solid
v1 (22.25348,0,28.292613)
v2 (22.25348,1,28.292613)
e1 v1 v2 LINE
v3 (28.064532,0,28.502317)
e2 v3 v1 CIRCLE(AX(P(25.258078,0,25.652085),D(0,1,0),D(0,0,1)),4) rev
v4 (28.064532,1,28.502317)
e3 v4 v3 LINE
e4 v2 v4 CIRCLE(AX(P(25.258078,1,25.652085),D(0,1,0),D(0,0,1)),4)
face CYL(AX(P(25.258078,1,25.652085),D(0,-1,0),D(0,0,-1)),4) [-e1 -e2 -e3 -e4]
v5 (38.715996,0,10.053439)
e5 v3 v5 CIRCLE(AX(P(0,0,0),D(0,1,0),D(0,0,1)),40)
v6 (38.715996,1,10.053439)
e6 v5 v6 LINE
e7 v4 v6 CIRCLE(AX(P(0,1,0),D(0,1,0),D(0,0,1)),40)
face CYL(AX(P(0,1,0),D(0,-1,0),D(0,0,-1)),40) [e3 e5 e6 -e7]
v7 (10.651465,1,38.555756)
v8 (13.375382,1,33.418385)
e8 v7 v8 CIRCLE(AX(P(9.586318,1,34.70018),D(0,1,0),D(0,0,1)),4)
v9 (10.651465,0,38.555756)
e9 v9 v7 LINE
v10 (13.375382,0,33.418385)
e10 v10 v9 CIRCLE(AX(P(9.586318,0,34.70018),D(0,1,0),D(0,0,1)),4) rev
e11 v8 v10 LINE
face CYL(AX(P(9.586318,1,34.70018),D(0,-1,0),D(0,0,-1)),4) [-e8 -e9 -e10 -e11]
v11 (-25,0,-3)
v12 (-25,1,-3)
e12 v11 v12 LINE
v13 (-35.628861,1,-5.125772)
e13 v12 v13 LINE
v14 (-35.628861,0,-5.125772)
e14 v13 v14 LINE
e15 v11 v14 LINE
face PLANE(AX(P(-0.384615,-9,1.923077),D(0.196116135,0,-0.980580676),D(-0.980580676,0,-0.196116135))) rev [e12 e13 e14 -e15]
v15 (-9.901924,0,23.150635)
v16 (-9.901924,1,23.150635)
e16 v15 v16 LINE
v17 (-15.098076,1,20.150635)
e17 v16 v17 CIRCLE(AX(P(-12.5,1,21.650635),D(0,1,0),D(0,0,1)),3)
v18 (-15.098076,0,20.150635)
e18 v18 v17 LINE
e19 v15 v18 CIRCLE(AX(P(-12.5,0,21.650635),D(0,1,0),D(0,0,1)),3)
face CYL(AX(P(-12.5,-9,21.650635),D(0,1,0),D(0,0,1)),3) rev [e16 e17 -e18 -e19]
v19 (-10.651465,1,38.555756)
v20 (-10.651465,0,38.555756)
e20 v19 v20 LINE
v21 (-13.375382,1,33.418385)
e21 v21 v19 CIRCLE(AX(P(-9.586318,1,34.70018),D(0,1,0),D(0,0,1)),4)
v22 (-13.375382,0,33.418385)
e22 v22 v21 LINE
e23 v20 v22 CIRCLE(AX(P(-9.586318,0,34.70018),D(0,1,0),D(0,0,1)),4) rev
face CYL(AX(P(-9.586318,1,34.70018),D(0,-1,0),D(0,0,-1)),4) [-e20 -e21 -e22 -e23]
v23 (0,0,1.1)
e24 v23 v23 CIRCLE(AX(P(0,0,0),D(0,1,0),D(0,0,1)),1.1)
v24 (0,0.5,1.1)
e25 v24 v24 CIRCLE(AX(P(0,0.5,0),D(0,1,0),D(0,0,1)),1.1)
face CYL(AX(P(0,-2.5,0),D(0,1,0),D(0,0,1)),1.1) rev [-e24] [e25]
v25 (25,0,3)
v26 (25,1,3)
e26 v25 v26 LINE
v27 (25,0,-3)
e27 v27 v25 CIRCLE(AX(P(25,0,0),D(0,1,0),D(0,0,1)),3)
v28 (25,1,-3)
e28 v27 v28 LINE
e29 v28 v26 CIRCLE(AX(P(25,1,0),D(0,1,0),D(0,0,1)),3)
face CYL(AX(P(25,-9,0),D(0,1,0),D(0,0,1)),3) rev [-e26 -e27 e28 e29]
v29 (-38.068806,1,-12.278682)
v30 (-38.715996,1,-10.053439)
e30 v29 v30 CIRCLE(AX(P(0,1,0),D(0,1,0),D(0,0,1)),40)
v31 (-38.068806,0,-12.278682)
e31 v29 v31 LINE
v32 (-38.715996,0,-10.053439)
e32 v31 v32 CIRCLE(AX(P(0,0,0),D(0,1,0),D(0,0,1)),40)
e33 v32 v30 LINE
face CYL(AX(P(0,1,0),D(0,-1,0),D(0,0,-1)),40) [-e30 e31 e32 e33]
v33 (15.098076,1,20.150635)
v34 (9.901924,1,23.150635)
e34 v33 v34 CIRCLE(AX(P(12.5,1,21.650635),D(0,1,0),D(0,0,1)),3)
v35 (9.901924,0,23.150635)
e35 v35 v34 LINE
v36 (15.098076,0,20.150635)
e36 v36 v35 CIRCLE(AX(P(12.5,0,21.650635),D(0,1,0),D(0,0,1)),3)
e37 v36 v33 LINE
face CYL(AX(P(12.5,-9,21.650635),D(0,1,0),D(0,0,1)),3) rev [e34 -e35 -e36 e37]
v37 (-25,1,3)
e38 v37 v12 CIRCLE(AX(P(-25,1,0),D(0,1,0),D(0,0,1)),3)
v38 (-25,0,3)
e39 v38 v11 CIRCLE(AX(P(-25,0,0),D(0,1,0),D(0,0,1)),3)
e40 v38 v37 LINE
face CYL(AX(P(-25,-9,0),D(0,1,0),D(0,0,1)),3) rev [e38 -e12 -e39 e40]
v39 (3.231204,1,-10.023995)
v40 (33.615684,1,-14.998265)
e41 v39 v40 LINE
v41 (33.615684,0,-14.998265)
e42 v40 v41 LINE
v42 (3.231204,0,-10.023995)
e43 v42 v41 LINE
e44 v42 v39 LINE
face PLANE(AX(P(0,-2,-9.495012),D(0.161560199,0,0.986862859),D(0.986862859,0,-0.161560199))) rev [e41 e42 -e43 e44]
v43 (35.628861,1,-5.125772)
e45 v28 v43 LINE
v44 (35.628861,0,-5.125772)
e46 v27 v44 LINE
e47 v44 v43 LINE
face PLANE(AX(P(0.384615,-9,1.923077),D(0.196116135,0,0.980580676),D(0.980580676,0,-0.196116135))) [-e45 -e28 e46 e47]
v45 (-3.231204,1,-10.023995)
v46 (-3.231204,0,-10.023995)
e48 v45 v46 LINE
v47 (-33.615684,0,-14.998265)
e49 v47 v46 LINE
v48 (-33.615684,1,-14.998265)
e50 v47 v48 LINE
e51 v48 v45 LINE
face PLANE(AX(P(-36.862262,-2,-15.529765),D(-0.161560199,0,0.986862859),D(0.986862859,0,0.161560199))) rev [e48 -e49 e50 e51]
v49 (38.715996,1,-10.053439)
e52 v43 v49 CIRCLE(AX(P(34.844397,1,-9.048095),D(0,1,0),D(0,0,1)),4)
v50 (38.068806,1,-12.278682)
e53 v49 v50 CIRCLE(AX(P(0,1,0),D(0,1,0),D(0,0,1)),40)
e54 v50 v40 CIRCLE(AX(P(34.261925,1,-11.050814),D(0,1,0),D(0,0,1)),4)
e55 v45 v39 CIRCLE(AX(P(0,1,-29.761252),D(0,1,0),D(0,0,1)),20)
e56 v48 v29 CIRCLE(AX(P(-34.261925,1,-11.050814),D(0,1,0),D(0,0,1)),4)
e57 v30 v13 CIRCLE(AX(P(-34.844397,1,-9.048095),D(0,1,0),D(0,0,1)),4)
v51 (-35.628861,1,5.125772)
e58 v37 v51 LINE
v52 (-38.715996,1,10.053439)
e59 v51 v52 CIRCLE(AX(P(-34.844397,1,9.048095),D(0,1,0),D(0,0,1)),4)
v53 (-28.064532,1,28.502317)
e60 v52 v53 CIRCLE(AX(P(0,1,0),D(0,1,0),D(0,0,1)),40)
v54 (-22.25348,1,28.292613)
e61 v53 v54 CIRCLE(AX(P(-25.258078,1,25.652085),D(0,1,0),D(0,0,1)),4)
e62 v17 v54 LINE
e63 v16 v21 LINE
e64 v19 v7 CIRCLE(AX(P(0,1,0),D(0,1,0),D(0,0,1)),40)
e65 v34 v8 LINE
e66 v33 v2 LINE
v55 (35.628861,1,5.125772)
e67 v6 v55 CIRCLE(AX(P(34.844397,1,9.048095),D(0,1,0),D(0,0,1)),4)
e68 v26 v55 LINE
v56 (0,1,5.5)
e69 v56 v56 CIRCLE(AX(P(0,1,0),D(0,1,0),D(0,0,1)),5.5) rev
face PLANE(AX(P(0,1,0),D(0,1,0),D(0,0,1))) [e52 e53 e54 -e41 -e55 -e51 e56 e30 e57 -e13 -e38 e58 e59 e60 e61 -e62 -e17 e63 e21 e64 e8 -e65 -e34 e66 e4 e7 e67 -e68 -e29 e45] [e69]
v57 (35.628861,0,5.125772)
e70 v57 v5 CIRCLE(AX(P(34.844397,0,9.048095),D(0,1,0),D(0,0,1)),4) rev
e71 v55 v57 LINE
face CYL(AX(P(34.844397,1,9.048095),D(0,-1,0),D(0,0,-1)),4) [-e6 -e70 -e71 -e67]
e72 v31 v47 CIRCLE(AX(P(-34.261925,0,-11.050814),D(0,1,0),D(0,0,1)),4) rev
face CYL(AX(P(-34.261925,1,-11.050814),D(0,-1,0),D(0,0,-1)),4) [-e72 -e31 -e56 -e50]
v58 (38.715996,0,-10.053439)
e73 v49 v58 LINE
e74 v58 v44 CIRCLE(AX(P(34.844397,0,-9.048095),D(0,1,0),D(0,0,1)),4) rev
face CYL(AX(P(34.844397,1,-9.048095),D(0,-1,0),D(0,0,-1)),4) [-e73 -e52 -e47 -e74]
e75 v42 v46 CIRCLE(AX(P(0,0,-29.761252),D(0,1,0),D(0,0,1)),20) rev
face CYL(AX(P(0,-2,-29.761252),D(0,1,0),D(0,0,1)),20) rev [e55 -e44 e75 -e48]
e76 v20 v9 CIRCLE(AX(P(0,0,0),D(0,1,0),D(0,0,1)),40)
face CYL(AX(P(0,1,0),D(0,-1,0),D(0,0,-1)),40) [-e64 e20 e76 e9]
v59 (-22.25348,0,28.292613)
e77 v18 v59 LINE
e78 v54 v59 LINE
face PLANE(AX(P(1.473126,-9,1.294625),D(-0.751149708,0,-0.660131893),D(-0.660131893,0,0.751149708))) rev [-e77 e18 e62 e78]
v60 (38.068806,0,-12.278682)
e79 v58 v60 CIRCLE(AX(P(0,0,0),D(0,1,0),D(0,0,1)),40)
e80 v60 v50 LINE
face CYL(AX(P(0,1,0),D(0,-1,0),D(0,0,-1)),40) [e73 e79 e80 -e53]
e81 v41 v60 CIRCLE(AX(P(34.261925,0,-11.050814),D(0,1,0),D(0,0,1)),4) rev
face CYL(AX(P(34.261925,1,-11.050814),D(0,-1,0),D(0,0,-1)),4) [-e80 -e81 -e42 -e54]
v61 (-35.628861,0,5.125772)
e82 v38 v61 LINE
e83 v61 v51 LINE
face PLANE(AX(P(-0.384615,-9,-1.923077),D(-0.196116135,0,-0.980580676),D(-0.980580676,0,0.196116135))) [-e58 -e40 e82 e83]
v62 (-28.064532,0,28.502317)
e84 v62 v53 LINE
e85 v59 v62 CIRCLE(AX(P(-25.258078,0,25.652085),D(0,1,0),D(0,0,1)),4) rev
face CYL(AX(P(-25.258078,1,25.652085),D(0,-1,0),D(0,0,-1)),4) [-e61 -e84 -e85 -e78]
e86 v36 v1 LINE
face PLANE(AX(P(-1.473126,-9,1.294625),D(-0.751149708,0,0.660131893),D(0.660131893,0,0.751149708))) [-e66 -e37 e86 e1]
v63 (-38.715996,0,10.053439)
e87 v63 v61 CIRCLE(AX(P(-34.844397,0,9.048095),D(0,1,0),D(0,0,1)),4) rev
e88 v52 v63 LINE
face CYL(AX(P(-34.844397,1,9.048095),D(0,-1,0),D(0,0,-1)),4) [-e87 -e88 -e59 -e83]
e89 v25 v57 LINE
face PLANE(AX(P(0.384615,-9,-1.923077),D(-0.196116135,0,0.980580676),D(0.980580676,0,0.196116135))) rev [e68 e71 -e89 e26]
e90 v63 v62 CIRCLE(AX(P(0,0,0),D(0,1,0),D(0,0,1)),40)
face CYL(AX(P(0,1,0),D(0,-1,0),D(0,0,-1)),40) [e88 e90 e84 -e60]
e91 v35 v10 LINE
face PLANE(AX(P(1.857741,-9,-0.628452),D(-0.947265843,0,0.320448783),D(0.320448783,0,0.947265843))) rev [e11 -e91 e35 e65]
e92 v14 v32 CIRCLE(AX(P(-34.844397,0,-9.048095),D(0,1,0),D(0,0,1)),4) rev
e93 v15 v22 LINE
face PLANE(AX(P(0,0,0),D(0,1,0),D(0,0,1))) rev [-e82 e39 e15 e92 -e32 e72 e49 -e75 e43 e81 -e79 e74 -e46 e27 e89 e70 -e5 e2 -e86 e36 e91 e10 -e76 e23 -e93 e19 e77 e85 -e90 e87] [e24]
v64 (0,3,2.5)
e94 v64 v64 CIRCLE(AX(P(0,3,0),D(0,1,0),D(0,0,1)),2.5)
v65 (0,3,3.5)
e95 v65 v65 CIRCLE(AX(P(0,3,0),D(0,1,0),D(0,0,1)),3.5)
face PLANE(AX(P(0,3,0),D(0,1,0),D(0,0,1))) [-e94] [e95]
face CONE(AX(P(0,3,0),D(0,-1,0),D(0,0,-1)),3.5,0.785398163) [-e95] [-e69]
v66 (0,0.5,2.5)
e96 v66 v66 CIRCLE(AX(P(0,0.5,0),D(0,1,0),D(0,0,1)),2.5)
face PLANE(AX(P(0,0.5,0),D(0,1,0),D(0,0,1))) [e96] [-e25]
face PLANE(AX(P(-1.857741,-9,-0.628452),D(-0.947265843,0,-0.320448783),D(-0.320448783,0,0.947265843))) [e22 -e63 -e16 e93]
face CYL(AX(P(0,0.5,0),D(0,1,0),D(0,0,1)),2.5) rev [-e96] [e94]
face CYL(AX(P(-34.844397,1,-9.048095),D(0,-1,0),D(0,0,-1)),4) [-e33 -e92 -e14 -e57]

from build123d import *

# Parameters (mm, degrees)
ESBO_O1_R                = 40
RESSALTO_EXTRUS_O1_DEPTH = 1
CORTE_EXTRUS_O1_START    = -10
CORTE_EXTRUS_O1_DEPTH    = 10
ESBO_O3_R                = 3.5
RESSALTO_EXTRUS_O2_DEPTH = 2
ESBO_O4_R                = 2.5
CORTE_EXTRUS_O2_DEPTH    = 2.5
CHANFRO1_SIZE            = 2
CORTE_EXTRUS_O3_DEPTH    = 3
FILETE1_R                = 4
ESBO_O6_R                = 1.1
CORTE_EXTRUS_O4_DEPTH    = 3
FILETE2_R                = 4
FILETE3_R                = 4
FILETE4_R                = 4
FILETE5_R                = 4
FILETE6_R                = 4
FILETE7_R                = 4
FILETE8_R                = 4
FILETE9_R                = 4
FILETE10_R               = 4
FILETE11_R               = 20


with BuildPart() as part:
    # Esboço1 → Ressalto-extrusão1 (new body)
    with BuildSketch(Plane(origin=(0, 0, 0), x_dir=(1, 0, 0), z_dir=(0, 1, 0))):
        with Locations(Location((0, 0, 0), (0, 0, 270))):
            Circle(ESBO_O1_R)
    extrude(amount=RESSALTO_EXTRUS_O1_DEPTH)

    # Esboço2 → Corte-extrusão1 (cut)
    with BuildSketch(Plane(origin=(0, 1, 0), x_dir=(1, 0, 0), z_dir=(0, 1, 0)).offset(CORTE_EXTRUS_O1_START)):
        with BuildLine():
            ThreePointArc((25, 3), (22, 0), (25, -3))
            Line((25, -3), (39.560670745, -5.912134149))
            ThreePointArc((39.560670745, -5.912134149), (40, 0), (39.560670745, 5.912134149))
            Line((39.560670745, 5.912134149), (25, 3))
        make_face()
        with BuildLine():
            ThreePointArc((-39.560670745, 5.912134149), (-40, 0), (-39.560670745, -5.912134149))
            Line((-39.560670745, -5.912134149), (-25, -3))
            ThreePointArc((-25, -3), (-22, 0), (-25, 3))
            Line((-25, 3), (-39.560670745, 5.912134149))
        make_face()
        with BuildLine():
            Line((9.901923789, -23.150635095), (14.660277009, -37.216612931))
            ThreePointArc((14.660277009, -37.216612931), (20, -34.641016151), (24.900393736, -31.304478782))
            Line((24.900393736, -31.304478782), (15.098076211, -20.150635095))
            ThreePointArc((15.098076211, -20.150635095), (11, -19.052558883), (9.901923789, -23.150635095))
        make_face()
        with BuildLine():
            ThreePointArc((-24.900393736, -31.304478782), (-20, -34.641016151), (-14.660277009, -37.216612931))
            Line((-14.660277009, -37.216612931), (-9.901923789, -23.150635095))
            ThreePointArc((-9.901923789, -23.150635095), (-11, -19.052558883), (-15.098076211, -20.150635095))
            Line((-15.098076211, -20.150635095), (-24.900393736, -31.304478782))
        make_face()
    extrude(amount=CORTE_EXTRUS_O1_DEPTH, mode=Mode.SUBTRACT)

    # Esboço3 → Ressalto-extrusão2 (add)
    with BuildSketch(Plane(origin=(0, 1, 0), x_dir=(1, 0, 0), z_dir=(0, 1, 0))):
        with Locations(Location((0, 0, 0), (0, 0, 270))):
            Circle(ESBO_O3_R)
    extrude(amount=RESSALTO_EXTRUS_O2_DEPTH)

    # Esboço4 → Corte-extrusão2 (cut)
    with BuildSketch(Plane(origin=(0, 3, 0), x_dir=(1, 0, 0), z_dir=(0, 1, 0))):
        with Locations(Location((0, 0, 0), (0, 0, 270))):
            Circle(ESBO_O4_R)
    extrude(amount=-CORTE_EXTRUS_O2_DEPTH, mode=Mode.SUBTRACT)

    # Chanfro1
    chanfro1_edges = [part.edges().sort_by_distance(p)[0] for p in [
        (0, 1, -3.5),
    ]]
    chamfer(chanfro1_edges, length=CHANFRO1_SIZE - 0.0001)  # a hair under: the kernel refuses the full size

    # Esboço5 → Corte-extrusão3 (cut)
    with BuildSketch(Plane(origin=(0, 1, 0), x_dir=(1, 0, 0), z_dir=(0, 1, 0))):
        Polygon((-36.862262331, 15.52976548), (0, 9.495011624), (36.862262331, 15.52976548), (36.862262331, 44.423786918), (-36.862262331, 44.423786918), align=None)
    extrude(amount=-CORTE_EXTRUS_O3_DEPTH, mode=Mode.SUBTRACT)

    # Filete1
    filete1_edges = [part.edges().sort_by_distance(p)[0] for p in [
        (36.862262331, 0.5, -15.52976548),
    ]]
    fillet(filete1_edges, radius=FILETE1_R)

    # Esboço6 → Corte-extrusão4 (cut)
    with BuildSketch(Plane(origin=(0, 0.5, 0), x_dir=(1, 0, 0), z_dir=(0, 1, 0))):
        with Locations(Location((0, 0, 0), (0, 0, 270))):
            Circle(ESBO_O6_R)
    extrude(amount=-CORTE_EXTRUS_O4_DEPTH, mode=Mode.SUBTRACT)

    # Filete2
    filete2_edges = [part.edges().sort_by_distance(p)[0] for p in [
        (-36.862262331, 0.5, -15.52976548),
    ]]
    fillet(filete2_edges, radius=FILETE2_R)

    # Filete3
    filete3_edges = [part.edges().sort_by_distance(p)[0] for p in [
        (-39.560670745, 0.5, -5.912134149),
    ]]
    fillet(filete3_edges, radius=FILETE3_R)

    # Filete4
    filete4_edges = [part.edges().sort_by_distance(p)[0] for p in [
        (-39.560670745, 0.5, 5.912134149),
    ]]
    fillet(filete4_edges, radius=FILETE4_R)

    # Filete5
    filete5_edges = [part.edges().sort_by_distance(p)[0] for p in [
        (-24.900393736, 0.5, 31.304478782),
    ]]
    fillet(filete5_edges, radius=FILETE5_R)

    # Filete6
    filete6_edges = [part.edges().sort_by_distance(p)[0] for p in [
        (-14.660277009, 0.5, 37.216612931),
    ]]
    fillet(filete6_edges, radius=FILETE6_R)

    # Filete7
    filete7_edges = [part.edges().sort_by_distance(p)[0] for p in [
        (14.660277009, 0.5, 37.216612931),
    ]]
    fillet(filete7_edges, radius=FILETE7_R)

    # Filete8
    filete8_edges = [part.edges().sort_by_distance(p)[0] for p in [
        (24.900393736, 0.5, 31.304478782),
    ]]
    fillet(filete8_edges, radius=FILETE8_R)

    # Filete9
    filete9_edges = [part.edges().sort_by_distance(p)[0] for p in [
        (39.560670745, 0.5, 5.912134149),
    ]]
    fillet(filete9_edges, radius=FILETE9_R)

    # Filete10
    filete10_edges = [part.edges().sort_by_distance(p)[0] for p in [
        (39.560670745, 0.5, -5.912134149),
    ]]
    fillet(filete10_edges, radius=FILETE10_R)

    # Filete11
    filete11_edges = [part.edges().sort_by_distance(p)[0] for p in [
        (0, 0.5, -9.495011624),
    ]]
    fillet(filete11_edges, radius=FILETE11_R)


solid = part.part
